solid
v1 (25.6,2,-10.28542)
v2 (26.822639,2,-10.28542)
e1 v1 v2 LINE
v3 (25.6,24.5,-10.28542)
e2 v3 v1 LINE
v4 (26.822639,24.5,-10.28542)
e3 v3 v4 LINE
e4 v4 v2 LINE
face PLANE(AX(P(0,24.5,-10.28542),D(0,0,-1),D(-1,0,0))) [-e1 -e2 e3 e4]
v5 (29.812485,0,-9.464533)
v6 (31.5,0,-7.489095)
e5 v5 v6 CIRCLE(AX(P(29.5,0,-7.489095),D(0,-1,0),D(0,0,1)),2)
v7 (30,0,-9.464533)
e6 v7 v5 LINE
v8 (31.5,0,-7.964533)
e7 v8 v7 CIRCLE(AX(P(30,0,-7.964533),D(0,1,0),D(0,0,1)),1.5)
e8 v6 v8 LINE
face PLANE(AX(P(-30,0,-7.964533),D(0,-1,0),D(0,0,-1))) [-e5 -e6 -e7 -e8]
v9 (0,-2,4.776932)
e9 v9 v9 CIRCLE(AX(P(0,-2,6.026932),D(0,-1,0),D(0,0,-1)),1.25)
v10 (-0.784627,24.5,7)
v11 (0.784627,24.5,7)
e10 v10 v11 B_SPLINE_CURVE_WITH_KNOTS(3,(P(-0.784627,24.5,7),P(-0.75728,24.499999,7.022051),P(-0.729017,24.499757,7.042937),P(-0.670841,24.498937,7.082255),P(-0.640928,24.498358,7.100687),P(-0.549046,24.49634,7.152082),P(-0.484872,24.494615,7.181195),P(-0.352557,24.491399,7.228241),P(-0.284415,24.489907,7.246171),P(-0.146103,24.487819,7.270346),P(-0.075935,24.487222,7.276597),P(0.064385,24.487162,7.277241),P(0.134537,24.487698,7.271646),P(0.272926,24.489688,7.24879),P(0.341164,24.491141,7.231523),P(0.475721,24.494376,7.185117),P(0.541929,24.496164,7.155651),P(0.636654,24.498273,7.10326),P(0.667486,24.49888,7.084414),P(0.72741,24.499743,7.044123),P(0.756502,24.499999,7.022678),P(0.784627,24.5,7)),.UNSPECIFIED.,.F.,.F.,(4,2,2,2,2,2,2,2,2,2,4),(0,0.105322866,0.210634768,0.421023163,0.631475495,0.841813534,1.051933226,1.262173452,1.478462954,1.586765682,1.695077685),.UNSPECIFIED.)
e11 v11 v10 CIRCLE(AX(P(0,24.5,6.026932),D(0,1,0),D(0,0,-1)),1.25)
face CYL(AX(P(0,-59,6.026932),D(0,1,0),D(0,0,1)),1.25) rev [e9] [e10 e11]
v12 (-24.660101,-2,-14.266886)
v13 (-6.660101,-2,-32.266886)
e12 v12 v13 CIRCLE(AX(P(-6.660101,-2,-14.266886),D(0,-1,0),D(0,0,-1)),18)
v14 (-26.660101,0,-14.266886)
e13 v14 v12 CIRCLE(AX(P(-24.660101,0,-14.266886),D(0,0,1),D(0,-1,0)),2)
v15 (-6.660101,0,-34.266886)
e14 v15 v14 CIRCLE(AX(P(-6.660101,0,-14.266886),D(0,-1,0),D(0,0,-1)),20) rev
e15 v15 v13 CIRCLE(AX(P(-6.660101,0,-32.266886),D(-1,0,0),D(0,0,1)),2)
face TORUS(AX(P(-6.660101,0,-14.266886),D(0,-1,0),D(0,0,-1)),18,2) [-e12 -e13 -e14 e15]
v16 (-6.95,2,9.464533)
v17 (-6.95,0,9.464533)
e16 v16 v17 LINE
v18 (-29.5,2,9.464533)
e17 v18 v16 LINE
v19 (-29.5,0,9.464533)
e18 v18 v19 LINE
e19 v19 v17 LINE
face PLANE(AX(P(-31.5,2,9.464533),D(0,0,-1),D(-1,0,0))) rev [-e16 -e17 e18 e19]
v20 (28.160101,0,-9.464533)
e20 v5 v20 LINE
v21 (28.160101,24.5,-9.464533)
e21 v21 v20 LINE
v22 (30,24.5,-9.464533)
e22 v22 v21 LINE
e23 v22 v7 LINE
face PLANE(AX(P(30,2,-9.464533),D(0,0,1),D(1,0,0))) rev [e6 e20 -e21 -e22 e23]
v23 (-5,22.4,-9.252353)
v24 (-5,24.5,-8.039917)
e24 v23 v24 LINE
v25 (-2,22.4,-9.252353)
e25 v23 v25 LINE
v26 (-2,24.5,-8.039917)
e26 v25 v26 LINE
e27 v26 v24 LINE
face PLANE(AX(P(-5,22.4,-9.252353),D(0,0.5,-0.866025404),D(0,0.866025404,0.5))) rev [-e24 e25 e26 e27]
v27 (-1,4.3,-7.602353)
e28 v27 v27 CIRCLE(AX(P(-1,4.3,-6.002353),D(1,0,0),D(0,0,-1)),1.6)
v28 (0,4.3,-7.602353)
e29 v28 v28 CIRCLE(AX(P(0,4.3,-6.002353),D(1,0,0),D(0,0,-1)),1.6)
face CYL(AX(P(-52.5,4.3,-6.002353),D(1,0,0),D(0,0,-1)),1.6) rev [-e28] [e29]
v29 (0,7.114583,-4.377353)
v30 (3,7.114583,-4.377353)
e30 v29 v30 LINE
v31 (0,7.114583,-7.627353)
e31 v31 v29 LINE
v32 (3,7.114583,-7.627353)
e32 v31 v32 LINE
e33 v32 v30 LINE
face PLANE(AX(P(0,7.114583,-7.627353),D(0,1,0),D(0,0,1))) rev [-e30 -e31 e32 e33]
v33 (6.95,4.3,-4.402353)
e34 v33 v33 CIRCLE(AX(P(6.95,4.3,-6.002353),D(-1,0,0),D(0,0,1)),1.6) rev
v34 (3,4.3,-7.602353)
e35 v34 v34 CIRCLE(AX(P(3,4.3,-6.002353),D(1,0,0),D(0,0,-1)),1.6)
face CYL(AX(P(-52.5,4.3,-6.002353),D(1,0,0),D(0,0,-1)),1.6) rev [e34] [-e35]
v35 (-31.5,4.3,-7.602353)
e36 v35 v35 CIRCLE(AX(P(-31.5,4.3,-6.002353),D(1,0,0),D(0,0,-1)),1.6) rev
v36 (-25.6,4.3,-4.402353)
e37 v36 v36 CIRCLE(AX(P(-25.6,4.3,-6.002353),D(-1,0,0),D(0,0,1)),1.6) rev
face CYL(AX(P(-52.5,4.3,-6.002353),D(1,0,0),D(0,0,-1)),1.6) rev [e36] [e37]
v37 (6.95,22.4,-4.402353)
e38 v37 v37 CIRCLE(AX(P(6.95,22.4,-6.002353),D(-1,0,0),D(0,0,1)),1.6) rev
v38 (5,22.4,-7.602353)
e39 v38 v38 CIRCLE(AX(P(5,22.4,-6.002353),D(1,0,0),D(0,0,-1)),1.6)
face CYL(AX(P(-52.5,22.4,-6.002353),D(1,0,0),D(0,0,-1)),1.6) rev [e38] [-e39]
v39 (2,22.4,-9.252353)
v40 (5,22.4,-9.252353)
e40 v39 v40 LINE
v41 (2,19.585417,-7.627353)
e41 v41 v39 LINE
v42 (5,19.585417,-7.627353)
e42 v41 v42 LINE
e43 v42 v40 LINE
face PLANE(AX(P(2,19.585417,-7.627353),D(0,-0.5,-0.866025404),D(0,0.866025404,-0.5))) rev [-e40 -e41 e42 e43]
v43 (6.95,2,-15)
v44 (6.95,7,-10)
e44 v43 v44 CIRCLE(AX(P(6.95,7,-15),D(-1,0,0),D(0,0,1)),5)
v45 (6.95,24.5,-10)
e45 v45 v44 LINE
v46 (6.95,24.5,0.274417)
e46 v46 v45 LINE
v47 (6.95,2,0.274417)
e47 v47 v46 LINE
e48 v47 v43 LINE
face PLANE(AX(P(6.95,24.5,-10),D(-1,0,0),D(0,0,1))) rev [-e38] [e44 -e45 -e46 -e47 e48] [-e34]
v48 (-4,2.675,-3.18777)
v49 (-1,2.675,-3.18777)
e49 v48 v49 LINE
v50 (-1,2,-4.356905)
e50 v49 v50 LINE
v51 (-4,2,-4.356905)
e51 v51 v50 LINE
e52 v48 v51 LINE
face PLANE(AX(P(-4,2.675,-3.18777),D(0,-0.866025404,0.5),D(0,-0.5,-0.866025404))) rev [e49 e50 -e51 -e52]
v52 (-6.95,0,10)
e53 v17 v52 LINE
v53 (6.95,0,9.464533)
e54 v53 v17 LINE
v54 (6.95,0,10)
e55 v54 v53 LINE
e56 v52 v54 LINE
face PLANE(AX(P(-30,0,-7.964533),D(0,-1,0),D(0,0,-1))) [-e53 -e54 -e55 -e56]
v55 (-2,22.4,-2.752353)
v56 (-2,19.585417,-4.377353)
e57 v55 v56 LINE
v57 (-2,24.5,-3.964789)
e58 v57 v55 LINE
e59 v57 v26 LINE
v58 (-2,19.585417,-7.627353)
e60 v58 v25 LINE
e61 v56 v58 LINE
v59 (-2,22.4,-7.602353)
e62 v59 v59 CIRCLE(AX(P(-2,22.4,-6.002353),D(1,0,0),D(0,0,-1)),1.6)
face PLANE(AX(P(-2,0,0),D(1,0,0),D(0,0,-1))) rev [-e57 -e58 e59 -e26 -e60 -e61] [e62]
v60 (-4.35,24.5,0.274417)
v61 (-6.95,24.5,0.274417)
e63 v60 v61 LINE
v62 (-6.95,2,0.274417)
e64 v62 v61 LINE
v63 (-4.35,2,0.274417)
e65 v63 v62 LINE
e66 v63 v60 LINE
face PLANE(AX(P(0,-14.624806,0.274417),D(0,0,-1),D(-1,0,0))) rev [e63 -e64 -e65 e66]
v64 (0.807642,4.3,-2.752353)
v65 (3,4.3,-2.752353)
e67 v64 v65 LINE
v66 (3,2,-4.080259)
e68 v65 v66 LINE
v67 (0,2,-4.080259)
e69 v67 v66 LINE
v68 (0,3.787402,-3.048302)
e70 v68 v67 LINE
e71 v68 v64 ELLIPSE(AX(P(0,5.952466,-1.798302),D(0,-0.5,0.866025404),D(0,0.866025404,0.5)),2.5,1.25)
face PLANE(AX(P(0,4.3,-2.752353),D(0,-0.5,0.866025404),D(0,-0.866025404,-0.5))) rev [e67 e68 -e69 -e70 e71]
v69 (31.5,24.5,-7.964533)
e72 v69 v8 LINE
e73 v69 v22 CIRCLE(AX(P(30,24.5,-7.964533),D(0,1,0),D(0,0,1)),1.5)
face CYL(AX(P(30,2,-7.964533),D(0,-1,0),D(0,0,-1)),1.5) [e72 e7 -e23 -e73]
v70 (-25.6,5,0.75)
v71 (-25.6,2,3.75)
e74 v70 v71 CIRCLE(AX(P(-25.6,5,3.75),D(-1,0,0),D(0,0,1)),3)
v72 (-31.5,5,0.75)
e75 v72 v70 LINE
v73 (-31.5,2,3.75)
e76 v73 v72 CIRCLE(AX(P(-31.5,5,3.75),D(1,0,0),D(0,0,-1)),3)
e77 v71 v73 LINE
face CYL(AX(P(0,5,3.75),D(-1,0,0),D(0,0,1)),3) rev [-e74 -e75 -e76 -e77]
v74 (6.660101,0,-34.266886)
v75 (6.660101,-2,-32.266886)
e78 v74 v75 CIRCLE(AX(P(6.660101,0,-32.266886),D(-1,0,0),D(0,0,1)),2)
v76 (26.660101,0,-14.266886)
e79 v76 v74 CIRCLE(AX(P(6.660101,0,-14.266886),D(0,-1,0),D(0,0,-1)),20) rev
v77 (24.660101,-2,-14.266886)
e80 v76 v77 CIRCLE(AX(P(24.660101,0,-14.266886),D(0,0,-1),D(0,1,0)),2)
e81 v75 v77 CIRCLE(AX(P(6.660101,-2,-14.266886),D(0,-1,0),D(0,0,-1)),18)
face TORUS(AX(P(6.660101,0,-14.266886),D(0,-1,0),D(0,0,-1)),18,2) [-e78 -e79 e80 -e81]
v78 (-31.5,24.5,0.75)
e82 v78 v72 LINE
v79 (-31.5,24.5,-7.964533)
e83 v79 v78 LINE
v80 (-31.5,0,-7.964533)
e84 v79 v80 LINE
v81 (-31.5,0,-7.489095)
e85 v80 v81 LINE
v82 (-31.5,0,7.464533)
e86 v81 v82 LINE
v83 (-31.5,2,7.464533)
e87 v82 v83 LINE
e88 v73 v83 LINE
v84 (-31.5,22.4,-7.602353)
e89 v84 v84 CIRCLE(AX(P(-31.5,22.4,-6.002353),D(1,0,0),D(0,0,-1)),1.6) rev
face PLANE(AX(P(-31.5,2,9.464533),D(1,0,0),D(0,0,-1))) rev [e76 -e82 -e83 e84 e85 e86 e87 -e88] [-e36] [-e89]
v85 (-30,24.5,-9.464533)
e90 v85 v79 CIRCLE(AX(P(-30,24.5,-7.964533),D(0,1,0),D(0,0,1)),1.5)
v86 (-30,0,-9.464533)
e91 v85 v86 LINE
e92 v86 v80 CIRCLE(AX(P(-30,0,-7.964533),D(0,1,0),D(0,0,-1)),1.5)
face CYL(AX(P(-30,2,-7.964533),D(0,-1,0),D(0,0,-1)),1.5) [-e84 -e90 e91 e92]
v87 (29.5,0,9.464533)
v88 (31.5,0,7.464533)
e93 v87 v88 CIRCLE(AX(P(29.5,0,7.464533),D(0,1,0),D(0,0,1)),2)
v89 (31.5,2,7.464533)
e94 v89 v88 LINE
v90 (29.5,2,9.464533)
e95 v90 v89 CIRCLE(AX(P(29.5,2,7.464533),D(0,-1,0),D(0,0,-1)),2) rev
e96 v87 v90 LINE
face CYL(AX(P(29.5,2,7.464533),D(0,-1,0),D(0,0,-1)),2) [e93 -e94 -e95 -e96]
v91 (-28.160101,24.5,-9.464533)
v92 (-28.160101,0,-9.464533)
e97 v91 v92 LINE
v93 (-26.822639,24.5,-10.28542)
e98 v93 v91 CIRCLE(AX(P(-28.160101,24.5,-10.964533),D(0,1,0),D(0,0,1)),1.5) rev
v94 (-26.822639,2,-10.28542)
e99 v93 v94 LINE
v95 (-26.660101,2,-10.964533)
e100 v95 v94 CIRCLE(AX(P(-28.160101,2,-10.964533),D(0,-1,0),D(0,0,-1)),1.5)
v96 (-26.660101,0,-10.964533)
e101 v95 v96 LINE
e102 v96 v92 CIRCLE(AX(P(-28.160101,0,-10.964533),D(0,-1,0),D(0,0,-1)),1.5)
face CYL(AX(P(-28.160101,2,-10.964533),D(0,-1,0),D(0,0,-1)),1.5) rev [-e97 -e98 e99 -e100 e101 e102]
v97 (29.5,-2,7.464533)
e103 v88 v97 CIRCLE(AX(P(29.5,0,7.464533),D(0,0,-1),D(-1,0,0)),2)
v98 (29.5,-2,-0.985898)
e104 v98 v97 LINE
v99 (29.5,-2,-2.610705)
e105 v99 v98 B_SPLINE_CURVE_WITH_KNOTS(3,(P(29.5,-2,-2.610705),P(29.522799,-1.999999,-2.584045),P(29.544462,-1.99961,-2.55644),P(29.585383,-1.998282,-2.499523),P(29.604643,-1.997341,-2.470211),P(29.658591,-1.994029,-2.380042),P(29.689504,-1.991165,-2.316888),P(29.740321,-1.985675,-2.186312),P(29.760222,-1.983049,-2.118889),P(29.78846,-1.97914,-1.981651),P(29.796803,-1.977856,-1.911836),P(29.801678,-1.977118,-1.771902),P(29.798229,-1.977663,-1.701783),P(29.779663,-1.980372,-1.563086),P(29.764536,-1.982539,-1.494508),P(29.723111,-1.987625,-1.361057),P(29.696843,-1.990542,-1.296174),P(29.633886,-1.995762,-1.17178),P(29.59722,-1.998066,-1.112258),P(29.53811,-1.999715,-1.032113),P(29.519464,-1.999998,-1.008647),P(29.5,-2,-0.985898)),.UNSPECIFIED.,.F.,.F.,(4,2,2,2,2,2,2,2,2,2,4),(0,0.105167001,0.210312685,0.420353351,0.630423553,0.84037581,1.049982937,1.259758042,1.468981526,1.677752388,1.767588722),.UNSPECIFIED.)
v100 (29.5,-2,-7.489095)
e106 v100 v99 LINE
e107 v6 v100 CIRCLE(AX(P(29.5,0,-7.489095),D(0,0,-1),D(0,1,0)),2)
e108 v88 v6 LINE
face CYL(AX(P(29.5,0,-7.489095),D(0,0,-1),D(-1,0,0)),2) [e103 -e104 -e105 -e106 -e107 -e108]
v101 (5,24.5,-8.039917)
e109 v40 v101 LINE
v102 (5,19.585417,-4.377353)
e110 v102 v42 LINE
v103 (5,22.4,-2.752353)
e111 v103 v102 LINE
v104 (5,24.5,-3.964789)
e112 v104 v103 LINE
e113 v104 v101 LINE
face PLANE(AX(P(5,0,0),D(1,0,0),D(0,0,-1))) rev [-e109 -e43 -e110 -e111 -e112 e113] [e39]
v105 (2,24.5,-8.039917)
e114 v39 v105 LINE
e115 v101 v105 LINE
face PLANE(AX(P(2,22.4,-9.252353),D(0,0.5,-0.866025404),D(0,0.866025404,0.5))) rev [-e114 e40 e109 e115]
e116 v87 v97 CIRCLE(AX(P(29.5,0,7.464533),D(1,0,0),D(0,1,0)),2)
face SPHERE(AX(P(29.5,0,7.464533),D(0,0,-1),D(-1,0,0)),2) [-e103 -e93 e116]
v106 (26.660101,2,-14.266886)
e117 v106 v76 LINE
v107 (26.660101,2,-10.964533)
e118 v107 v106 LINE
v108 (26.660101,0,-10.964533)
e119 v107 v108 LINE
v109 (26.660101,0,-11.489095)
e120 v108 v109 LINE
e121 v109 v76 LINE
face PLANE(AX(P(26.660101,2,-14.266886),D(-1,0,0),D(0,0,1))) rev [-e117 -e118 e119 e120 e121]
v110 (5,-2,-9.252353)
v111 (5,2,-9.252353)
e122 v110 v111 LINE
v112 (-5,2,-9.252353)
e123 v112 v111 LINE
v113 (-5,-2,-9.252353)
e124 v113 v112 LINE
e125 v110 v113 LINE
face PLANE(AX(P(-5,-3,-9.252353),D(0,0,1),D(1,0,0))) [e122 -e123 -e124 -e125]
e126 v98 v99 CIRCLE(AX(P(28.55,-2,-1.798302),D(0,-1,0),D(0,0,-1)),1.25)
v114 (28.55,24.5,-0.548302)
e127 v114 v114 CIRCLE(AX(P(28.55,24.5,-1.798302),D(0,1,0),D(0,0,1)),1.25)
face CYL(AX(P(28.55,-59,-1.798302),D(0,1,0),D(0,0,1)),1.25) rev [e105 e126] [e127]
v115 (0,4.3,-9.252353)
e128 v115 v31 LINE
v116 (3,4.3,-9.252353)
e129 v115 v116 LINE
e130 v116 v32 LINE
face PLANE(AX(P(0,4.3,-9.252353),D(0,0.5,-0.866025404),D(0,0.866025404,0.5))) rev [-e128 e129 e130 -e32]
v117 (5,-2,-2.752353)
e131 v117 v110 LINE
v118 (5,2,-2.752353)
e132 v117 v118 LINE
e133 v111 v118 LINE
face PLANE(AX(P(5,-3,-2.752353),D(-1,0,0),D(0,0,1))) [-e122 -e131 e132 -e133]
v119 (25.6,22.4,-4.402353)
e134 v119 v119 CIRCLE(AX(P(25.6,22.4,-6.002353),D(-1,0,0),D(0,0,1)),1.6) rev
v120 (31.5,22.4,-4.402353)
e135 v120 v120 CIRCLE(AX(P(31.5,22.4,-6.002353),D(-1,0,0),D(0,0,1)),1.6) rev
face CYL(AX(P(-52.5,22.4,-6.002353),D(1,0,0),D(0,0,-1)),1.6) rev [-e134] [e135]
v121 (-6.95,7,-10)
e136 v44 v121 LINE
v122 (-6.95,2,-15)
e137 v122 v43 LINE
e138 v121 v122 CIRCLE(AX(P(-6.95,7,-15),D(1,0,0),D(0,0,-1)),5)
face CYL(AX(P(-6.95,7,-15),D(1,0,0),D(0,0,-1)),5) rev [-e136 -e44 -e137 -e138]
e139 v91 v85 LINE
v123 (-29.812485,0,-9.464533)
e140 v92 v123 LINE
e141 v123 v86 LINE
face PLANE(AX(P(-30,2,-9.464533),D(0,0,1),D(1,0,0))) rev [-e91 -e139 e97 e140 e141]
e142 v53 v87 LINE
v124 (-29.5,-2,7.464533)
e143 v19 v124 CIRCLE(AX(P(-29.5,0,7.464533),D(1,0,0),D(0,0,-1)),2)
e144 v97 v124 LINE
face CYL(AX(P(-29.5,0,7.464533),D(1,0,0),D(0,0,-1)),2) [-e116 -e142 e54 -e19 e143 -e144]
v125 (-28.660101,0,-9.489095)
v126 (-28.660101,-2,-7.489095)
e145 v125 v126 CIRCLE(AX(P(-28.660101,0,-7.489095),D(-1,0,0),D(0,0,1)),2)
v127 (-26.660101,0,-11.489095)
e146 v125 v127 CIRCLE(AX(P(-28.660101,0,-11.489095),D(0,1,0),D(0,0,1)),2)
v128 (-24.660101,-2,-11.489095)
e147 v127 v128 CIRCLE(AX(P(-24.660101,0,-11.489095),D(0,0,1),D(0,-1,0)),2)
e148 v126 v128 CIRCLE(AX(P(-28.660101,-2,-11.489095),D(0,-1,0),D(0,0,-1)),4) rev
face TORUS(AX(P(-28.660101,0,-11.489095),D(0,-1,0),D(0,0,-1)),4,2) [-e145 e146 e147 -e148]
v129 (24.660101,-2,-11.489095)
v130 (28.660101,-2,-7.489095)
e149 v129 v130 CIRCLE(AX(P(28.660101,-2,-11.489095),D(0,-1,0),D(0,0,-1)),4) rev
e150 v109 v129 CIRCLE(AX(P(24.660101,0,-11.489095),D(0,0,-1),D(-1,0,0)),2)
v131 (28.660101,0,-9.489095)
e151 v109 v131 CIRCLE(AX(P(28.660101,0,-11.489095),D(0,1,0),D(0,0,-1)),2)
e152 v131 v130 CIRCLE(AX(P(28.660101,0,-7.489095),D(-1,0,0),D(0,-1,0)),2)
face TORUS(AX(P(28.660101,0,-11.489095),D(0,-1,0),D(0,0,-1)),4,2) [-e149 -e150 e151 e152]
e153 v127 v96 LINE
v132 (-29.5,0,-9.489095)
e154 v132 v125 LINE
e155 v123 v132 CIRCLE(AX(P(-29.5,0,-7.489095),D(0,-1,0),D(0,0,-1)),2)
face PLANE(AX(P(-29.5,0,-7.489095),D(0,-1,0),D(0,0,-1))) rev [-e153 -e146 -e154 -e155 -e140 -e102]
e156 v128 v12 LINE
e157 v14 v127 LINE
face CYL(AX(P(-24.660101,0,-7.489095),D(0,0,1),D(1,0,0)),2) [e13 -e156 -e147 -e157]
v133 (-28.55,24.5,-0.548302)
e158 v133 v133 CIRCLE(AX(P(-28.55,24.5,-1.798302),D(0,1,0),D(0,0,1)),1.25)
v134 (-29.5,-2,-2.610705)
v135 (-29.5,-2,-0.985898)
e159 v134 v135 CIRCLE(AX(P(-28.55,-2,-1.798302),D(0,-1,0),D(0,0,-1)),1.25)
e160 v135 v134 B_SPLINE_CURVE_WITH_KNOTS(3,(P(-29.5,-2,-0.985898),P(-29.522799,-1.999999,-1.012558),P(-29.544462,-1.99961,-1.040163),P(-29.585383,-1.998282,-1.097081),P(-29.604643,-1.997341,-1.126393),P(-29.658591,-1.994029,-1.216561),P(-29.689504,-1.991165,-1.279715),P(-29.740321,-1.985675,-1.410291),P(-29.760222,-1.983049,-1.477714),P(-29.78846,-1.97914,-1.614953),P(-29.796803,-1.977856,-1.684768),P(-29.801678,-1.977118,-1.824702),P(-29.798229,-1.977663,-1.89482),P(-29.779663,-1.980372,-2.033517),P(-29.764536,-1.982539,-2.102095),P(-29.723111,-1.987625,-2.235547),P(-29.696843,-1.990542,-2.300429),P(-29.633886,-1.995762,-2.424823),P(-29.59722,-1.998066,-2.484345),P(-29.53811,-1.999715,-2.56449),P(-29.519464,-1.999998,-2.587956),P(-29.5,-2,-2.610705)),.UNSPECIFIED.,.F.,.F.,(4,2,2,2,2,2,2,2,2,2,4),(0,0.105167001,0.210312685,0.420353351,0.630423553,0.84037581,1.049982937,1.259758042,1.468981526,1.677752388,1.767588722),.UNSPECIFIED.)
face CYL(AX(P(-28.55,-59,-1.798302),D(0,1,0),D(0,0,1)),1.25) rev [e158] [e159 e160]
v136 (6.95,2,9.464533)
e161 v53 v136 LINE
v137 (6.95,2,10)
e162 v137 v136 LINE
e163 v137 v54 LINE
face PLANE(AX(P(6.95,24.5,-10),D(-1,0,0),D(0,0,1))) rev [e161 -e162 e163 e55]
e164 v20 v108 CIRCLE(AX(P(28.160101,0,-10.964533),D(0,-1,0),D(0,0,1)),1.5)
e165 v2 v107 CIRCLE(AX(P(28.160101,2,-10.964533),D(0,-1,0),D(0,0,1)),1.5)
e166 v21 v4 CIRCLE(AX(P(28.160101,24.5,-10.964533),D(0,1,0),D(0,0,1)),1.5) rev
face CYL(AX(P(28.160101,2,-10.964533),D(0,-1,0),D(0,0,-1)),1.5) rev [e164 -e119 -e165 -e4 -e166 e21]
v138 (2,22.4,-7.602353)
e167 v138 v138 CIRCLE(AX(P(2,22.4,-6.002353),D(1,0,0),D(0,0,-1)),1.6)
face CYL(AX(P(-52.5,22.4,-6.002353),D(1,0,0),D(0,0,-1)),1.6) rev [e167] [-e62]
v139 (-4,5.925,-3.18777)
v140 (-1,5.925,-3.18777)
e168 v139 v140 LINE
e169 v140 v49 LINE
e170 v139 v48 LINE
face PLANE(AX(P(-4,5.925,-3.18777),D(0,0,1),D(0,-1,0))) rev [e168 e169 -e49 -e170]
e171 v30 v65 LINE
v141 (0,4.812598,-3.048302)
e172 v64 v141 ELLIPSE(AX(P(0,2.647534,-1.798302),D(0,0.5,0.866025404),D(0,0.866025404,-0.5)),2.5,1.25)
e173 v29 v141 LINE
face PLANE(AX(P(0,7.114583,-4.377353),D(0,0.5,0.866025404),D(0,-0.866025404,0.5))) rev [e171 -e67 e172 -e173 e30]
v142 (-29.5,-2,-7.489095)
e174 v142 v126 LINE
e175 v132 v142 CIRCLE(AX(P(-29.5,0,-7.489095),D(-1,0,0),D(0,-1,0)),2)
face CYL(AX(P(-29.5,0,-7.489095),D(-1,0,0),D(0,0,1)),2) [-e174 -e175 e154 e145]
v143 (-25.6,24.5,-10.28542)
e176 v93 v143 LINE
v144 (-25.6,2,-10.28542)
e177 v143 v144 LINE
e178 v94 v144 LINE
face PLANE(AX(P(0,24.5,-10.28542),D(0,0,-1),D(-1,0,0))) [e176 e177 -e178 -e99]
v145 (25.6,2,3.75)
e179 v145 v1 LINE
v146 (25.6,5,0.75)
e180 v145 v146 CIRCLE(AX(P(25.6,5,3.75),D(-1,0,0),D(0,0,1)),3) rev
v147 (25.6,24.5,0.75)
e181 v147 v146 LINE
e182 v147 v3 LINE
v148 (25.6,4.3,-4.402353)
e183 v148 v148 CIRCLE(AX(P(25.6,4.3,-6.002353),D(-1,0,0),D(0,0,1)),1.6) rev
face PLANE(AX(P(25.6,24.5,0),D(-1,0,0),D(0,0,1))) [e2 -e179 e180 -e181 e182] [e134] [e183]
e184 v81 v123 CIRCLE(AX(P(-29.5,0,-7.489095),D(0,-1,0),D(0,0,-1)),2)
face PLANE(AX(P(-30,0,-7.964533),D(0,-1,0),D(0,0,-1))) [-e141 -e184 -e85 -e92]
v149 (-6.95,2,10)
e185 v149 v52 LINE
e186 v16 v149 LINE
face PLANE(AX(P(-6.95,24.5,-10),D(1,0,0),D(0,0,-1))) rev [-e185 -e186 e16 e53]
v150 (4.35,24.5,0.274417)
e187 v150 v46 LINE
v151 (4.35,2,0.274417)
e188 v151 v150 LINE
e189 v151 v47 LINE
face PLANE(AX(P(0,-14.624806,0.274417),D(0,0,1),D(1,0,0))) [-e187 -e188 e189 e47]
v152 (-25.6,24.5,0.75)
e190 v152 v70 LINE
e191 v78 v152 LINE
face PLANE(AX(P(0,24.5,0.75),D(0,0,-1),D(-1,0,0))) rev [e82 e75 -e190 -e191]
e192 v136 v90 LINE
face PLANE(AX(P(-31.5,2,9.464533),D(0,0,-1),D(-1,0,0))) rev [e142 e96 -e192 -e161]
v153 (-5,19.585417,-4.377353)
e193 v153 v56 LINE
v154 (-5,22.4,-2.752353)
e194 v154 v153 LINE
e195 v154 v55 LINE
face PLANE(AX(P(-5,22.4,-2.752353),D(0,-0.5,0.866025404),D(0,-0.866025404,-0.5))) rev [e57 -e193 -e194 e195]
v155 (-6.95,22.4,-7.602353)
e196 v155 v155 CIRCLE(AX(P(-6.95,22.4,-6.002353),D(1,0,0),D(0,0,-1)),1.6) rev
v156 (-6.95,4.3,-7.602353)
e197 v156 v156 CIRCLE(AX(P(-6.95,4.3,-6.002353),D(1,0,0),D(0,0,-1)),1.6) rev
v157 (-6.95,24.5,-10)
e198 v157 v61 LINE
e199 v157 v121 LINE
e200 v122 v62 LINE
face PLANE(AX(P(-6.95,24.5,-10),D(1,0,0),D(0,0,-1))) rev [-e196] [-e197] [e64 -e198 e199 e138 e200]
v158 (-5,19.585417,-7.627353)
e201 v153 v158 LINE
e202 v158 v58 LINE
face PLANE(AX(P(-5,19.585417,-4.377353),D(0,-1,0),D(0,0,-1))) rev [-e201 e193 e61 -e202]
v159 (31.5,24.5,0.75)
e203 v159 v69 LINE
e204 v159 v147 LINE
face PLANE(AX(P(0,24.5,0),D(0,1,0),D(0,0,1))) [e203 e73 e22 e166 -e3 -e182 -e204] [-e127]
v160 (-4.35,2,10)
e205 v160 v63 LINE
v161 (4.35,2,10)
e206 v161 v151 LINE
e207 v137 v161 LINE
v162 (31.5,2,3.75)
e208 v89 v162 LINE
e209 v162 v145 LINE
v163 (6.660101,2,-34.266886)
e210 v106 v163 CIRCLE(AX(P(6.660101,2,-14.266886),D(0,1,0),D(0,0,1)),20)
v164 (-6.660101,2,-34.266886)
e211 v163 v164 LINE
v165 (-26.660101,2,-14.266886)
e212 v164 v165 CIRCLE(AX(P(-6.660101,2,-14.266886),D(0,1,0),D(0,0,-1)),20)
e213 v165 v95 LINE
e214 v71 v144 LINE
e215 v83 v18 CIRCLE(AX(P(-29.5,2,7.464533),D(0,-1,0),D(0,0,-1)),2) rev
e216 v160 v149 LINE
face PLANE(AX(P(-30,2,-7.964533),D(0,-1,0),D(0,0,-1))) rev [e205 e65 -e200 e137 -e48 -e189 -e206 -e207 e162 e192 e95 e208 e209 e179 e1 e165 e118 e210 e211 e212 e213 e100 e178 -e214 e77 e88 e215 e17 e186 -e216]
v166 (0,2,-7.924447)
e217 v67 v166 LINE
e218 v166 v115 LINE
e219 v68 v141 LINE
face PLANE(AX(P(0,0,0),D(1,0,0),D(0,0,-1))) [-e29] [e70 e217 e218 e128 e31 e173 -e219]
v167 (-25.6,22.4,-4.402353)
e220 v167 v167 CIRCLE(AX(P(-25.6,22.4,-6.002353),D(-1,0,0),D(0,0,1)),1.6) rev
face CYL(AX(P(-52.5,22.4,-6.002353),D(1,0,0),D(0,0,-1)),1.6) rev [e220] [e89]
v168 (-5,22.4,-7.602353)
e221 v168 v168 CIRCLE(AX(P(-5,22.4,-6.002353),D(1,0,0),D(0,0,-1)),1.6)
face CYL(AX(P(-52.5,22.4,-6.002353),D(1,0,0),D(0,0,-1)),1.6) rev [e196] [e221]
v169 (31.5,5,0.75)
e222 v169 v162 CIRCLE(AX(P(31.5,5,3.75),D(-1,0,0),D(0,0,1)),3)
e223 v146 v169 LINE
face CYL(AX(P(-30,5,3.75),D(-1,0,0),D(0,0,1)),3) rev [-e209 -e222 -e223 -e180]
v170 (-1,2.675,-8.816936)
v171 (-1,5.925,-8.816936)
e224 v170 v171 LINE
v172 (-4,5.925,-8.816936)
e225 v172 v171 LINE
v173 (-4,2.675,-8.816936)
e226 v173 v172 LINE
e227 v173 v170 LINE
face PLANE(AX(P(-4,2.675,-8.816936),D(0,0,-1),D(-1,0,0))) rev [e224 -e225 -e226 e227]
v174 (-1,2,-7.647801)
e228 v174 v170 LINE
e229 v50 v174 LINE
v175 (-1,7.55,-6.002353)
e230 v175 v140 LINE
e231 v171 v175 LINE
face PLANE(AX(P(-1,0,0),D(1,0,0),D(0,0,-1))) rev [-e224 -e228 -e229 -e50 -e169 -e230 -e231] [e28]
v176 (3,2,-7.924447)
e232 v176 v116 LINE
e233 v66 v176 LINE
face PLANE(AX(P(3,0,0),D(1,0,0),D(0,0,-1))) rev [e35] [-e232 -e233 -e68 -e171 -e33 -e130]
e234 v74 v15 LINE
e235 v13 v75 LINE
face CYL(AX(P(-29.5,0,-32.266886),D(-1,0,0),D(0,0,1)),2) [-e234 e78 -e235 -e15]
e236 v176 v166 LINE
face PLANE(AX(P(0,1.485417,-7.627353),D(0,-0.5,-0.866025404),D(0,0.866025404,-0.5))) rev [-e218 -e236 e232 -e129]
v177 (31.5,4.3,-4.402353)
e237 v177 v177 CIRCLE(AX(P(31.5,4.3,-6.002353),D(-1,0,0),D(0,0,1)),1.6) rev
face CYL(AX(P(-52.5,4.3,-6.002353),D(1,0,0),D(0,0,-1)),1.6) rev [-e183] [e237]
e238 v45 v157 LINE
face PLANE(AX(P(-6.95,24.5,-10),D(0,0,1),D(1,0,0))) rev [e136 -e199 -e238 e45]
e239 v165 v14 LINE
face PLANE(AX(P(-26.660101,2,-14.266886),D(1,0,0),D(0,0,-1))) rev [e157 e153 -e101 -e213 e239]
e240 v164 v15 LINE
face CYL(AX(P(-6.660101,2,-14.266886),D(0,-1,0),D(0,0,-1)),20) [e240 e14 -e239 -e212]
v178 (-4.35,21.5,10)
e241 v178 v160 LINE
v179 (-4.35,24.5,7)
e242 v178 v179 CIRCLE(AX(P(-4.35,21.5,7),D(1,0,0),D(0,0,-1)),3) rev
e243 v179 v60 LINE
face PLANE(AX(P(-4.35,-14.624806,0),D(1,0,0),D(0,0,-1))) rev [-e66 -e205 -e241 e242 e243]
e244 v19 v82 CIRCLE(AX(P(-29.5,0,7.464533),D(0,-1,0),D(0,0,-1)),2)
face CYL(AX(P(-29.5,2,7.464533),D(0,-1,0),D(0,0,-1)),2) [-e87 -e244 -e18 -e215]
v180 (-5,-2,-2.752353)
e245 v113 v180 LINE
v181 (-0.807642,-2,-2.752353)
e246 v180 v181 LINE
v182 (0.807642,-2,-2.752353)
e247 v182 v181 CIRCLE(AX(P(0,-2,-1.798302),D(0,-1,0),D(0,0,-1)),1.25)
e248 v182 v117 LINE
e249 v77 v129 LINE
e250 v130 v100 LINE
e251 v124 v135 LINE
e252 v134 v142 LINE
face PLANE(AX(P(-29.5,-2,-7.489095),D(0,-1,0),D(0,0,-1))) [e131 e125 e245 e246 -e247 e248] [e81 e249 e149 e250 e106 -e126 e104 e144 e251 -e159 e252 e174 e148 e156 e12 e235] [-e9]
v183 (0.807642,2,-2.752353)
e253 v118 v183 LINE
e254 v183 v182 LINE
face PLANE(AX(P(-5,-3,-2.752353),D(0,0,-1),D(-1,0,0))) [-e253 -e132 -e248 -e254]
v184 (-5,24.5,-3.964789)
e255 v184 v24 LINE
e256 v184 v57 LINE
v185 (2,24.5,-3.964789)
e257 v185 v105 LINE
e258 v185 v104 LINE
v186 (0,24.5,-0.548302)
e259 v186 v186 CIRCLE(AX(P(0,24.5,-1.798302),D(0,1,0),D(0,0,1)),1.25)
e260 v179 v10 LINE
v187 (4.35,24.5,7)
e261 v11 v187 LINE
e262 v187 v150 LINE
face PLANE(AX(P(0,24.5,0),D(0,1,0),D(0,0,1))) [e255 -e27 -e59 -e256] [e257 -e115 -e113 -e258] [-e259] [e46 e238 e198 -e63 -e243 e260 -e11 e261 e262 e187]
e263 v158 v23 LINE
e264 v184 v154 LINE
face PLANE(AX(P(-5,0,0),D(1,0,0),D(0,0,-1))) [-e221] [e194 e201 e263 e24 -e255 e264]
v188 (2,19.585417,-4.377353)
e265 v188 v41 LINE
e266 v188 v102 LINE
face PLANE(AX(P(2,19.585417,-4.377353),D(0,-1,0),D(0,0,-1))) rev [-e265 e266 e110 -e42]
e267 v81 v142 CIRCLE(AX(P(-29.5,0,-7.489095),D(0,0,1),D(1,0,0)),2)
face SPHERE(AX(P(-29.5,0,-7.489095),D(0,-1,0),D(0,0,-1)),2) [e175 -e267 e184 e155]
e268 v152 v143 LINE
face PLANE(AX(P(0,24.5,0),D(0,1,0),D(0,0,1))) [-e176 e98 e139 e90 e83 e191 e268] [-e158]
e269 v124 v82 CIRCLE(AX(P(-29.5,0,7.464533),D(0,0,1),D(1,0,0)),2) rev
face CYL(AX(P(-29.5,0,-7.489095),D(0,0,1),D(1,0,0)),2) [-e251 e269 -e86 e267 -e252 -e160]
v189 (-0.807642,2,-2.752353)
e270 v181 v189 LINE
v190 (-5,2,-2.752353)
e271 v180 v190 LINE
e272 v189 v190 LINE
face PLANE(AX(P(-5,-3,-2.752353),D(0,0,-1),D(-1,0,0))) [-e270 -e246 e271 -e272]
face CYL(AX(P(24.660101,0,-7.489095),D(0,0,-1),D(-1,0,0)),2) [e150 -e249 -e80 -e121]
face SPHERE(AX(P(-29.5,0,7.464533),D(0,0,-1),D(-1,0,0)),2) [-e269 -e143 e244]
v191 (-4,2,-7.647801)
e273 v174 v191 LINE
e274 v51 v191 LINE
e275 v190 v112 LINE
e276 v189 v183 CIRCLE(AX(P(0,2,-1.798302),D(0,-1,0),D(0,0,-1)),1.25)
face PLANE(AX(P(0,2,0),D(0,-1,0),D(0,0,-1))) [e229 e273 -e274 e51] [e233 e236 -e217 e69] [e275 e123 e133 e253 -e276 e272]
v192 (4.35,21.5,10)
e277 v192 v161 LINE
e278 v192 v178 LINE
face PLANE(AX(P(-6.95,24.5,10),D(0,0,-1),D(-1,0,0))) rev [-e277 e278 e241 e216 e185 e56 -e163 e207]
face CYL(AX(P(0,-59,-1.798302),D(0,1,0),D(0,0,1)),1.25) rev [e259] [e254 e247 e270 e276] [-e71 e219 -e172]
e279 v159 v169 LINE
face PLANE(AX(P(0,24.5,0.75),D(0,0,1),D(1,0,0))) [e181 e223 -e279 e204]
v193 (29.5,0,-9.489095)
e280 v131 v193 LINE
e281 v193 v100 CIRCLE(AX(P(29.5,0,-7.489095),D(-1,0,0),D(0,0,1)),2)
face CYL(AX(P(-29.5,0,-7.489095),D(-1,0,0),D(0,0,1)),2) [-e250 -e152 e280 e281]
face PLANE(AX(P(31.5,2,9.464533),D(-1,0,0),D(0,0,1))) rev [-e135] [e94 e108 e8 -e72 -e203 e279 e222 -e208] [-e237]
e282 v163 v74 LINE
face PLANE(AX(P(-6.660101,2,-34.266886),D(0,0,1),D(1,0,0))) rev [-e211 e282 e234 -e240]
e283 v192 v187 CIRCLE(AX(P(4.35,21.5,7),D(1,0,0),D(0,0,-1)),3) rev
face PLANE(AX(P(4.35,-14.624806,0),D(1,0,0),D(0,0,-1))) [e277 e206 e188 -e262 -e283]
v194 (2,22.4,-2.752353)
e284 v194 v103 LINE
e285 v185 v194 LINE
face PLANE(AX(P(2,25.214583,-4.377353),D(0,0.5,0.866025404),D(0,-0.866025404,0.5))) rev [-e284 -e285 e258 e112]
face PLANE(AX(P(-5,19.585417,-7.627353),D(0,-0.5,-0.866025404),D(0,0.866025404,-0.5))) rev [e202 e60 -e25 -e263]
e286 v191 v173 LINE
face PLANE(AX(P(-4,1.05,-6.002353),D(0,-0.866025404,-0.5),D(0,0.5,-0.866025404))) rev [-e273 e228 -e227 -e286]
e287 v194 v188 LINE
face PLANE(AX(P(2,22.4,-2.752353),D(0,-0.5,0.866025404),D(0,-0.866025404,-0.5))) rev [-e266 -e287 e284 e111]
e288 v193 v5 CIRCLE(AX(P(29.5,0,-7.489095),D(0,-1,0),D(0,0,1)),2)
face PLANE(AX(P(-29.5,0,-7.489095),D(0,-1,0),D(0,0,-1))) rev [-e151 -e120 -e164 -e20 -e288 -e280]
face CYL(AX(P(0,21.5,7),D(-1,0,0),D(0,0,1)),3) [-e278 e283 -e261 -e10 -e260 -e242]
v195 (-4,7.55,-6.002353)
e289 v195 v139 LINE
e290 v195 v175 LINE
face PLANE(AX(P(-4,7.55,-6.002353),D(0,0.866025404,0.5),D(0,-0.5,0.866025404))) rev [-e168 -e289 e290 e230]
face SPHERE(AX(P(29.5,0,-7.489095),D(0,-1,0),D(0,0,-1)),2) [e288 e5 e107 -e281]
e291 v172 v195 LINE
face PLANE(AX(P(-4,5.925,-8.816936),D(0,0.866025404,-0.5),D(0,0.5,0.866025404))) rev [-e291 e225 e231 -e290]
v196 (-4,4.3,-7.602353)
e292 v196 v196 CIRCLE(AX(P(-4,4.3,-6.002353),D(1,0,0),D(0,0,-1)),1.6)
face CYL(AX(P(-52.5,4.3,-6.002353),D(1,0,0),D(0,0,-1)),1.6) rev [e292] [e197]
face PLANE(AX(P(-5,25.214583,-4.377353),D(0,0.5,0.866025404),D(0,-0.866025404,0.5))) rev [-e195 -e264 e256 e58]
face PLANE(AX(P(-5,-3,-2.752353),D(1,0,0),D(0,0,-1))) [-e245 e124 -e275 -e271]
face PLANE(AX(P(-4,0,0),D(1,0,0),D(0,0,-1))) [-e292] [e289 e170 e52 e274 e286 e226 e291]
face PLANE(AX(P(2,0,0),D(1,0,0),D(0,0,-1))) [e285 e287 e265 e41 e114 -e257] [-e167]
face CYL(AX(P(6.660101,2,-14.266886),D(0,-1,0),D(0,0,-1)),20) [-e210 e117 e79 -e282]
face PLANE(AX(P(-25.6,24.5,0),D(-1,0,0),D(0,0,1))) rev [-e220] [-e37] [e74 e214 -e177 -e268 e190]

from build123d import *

# Parameters (mm, degrees)
SALIENTE_EXTRUIR1_DEPTH    = 2
CROQUIS2_W                 = 13.9
CROQUIS2_H                 = 20
SALIENTE_EXTRUIR2_DEPTH    = 24.5
SALIENTE_EXTRUIR3_DEPTH    = 22.5
CORTAR_EXTRUIR1_DEPTH      = 27
CORTAR_EXTRUIR1_DEPTH_BACK = 65.5
CROQUIS4_R                 = 1.599999999
REDONDEO1_R                = 3
REDONDEO2_R                = 5
CORTAR_EXTRUIR3_START      = 5
CORTAR_EXTRUIR3_DEPTH      = 3
CORTAR_EXTRUIR4_START      = -2
CORTAR_EXTRUIR4_DEPTH      = 3
CORTAR_EXTRUIR5_START      = -1
CORTAR_EXTRUIR5_DEPTH      = 3
CORTAR_EXTRUIR6_START      = 3
CORTAR_EXTRUIR6_DEPTH      = 3
SALIENTE_EXTRUIR5_START    = 2
SALIENTE_EXTRUIR5_DEPTH    = 2
CORTAR_EXTRUIR8_START      = -22.5
CROQUIS16_W                = 2.6
CROQUIS16_H                = 6.725582711
CROQUIS16_H_2              = 9.694654401
CORTAR_EXTRUIR8_DEPTH      = 22.5
CORTAR_EXTRUIR7_DEPTH      = 3
CORTAR_EXTRUIR7_DEPTH_BACK = 2
CROQUIS13_W                = 10
CROQUIS13_H                = 6.5
REDONDEO6_R                = 2
REDONDEO7_R                = 2
CROQUIS5_R                 = 1.25
CORTAR_EXTRUIR2_DEPTH      = 83.5


# Read off the part's stored shape, not the designer's step: Saliente-Extruir3
with BuildPart() as part:
    # Croquis1 → Saliente-Extruir1 (new body)
    with BuildSketch(Plane(origin=(0, 0, 0), x_dir=(1, 0, 0), z_dir=(0, 1, 0))):
        with BuildLine():
            Line((-31.5, -9.464532567), (31.5, -9.464532567))
            Line((31.5, -9.464532567), (31.5, 7.964532567))
            ThreePointArc((31.5, 7.964532567), (31.060660172, 9.025192739), (30, 9.464532567))
            Line((30, 9.464532567), (28.160101256, 9.464532567))
            ThreePointArc((28.160101256, 9.464532567), (27.099441084, 9.903872396), (26.660101256, 10.964532567))
            Line((26.660101256, 10.964532567), (26.660101256, 14.266885585))
            ThreePointArc((26.660101256, 14.266885585), (20.802236879, 28.409021208), (6.660101256, 34.266885585))
            Line((6.660101256, 34.266885585), (-6.660101256, 34.266885585))
            ThreePointArc((-6.660101256, 34.266885585), (-20.802236879, 28.409021208), (-26.660101256, 14.266885585))
            Line((-26.660101256, 14.266885585), (-26.660101256, 10.964532567))
            ThreePointArc((-26.660101256, 10.964532567), (-27.099441084, 9.903872396), (-28.160101256, 9.464532567))
            Line((-28.160101256, 9.464532567), (-30, 9.464532567))
            ThreePointArc((-30, 9.464532567), (-31.060660172, 9.025192739), (-31.5, 7.964532567))
            Line((-31.5, 7.964532567), (-31.5, -9.464532567))
        make_face()
    extrude(amount=SALIENTE_EXTRUIR1_DEPTH)

    # Croquis2 → Saliente-Extruir2 (add)
    with BuildSketch(Plane(origin=(0, 0, 0), x_dir=(1, 0, 0), z_dir=(0, 1, 0))):
        Rectangle(CROQUIS2_W, CROQUIS2_H)
    extrude(amount=SALIENTE_EXTRUIR2_DEPTH)

    # Saliente-Extruir3 outline → Saliente-Extruir3 (add)
    with BuildSketch(Plane(origin=(0, 2, 0), x_dir=(1, 0, 0), z_dir=(0, 1, 0))):
        with BuildLine():
            Line((-31.5, 7.964532567), (-31.5, -0.75))
            Line((-31.5, -0.75), (-25.6, -0.75))
            Line((-25.6, -0.75), (-25.6, 10.285420177))
            Line((-25.6, 10.285420177), (-26.822638598, 10.285420177))
            ThreePointArc((-26.822638598, 10.285420177), (-27.375457574, 9.686121721), (-28.160101256, 9.464532567))
            Line((-28.160101256, 9.464532567), (-30, 9.464532567))
            ThreePointArc((-30, 9.464532567), (-31.060660172, 9.025192739), (-31.5, 7.964532567))
        make_face()
        with BuildLine():
            Line((31.5, -0.75), (31.5, 7.964532567))
            ThreePointArc((31.5, 7.964532567), (31.060660172, 9.025192739), (30, 9.464532567))
            Line((30, 9.464532567), (28.160101256, 9.464532567))
            ThreePointArc((28.160101256, 9.464532567), (27.375457574, 9.686121721), (26.822638598, 10.285420177))
            Line((26.822638598, 10.285420177), (25.6, 10.285420177))
            Line((25.6, 10.285420177), (25.6, -0.75))
            Line((25.6, -0.75), (31.5, -0.75))
        make_face()
    extrude(amount=SALIENTE_EXTRUIR3_DEPTH)

    # Croquis4 → Cortar-Extruir1 (cut, two sides: drawn at the far end of the back side and taken through both)
    with BuildSketch(Plane.ZY.offset(25.5).offset(-CORTAR_EXTRUIR1_DEPTH_BACK)):
        with Locations((-6.002353017, 4.3)):
            Circle(CROQUIS4_R)
        with Locations((-6.002353017, 22.4)):
            Circle(CROQUIS4_R)
    extrude(amount=CORTAR_EXTRUIR1_DEPTH + CORTAR_EXTRUIR1_DEPTH_BACK, mode=Mode.SUBTRACT)

    # Redondeo1
    redondeo1_edges = [part.edges().sort_by_distance(p)[0] for p in [
        (0, 24.5, 10),
        (-28.55, 2, 0.75),
        (28.55, 2, 0.75),
    ]]
    fillet(redondeo1_edges, radius=REDONDEO1_R)

    # Redondeo2
    redondeo2_edges = [part.edges().sort_by_distance(p)[0] for p in [
        (0, 2, -10),
    ]]
    fillet(redondeo2_edges, radius=REDONDEO2_R)

    # Croquis8 → Cortar-Extruir3 (cut)
    with BuildSketch(Plane(origin=(0, 0, 0), x_dir=(0, 0, -1), z_dir=(1, 0, 0)).offset(CORTAR_EXTRUIR3_START)):
        Polygon((2.752353017, 22.4), (4.377353017, 19.585417438), (7.627353017, 19.585417438), (9.252353017, 22.4), (7.627353017, 25.214582562), (4.377353017, 25.214582562), align=None)
    extrude(amount=-CORTAR_EXTRUIR3_DEPTH, mode=Mode.SUBTRACT)

    # Croquis9 → Cortar-Extruir4 (cut)
    with BuildSketch(Plane(origin=(0, 0, 0), x_dir=(0, 0, -1), z_dir=(1, 0, 0)).offset(CORTAR_EXTRUIR4_START)):
        Polygon((2.752353017, 22.4), (4.377353017, 19.585417438), (7.627353017, 19.585417438), (9.252353017, 22.4), (7.627353017, 25.214582562), (4.377353017, 25.214582562), align=None)
    extrude(amount=-CORTAR_EXTRUIR4_DEPTH, mode=Mode.SUBTRACT)

    # Croquis10 → Cortar-Extruir5 (cut)
    with BuildSketch(Plane(origin=(0, 0, 0), x_dir=(0, 0, -1), z_dir=(1, 0, 0)).offset(CORTAR_EXTRUIR5_START)):
        Polygon((6.002353017, 7.55), (3.187770455, 5.925), (3.187770455, 2.675), (6.002353017, 1.05), (8.816935579, 2.675), (8.816935579, 5.925), align=None)
    extrude(amount=-CORTAR_EXTRUIR5_DEPTH, mode=Mode.SUBTRACT)

    # Croquis11 → Cortar-Extruir6 (cut)
    with BuildSketch(Plane(origin=(0, 0, 0), x_dir=(0, 0, -1), z_dir=(1, 0, 0)).offset(CORTAR_EXTRUIR6_START)):
        Polygon((2.752353017, 4.3), (4.377353017, 1.485417438), (7.627353017, 1.485417438), (9.252353017, 4.3), (7.627353017, 7.114582562), (4.377353017, 7.114582562), align=None)
    extrude(amount=-CORTAR_EXTRUIR6_DEPTH, mode=Mode.SUBTRACT)

    # Croquis15 → Saliente-Extruir5 (add)
    with BuildSketch(Plane.XZ.offset(SALIENTE_EXTRUIR5_START)):
        with BuildLine():
            Line((-31.5, 9.464532567), (31.5, 9.464532567))
            Line((31.5, 9.464532567), (31.5, -7.489095092))
            ThreePointArc((31.5, -7.489095092), (30.914213562, -8.903308654), (29.5, -9.489095092))
            Line((29.5, -9.489095092), (28.660101256, -9.489095092))
            ThreePointArc((28.660101256, -9.489095092), (27.245887693, -10.074881529), (26.660101256, -11.489095092))
            Line((26.660101256, -11.489095092), (26.660101256, -14.266885585))
            ThreePointArc((26.660101256, -14.266885585), (20.802236879, -28.409021208), (6.660101256, -34.266885585))
            Line((6.660101256, -34.266885585), (1.137553535, -34.266885585))
            Line((1.137553535, -34.266885585), (-1.137553535, -34.266885585))
            Line((-1.137553535, -34.266885585), (-6.660101256, -34.266885585))
            ThreePointArc((-6.660101256, -34.266885585), (-20.802236879, -28.409021208), (-26.660101256, -14.266885585))
            Line((-26.660101256, -14.266885585), (-26.660101256, -11.489095092))
            ThreePointArc((-26.660101256, -11.489095092), (-27.245887693, -10.074881529), (-28.660101256, -9.489095092))
            Line((-28.660101256, -9.489095092), (-29.5, -9.489095092))
            ThreePointArc((-29.5, -9.489095092), (-30.914213562, -8.903308654), (-31.5, -7.489095092))
            Line((-31.5, -7.489095092), (-31.5, 9.464532567))
        make_face()
    extrude(amount=-SALIENTE_EXTRUIR5_DEPTH)

    # Croquis16 → Cortar-Extruir8 (cut)
    with BuildSketch(Plane(origin=(0, 24.5, 0), x_dir=(1, 0, 0), z_dir=(0, 1, 0)).offset(CORTAR_EXTRUIR8_START)):
        with Locations((5.65, -3.637208644)):
            Rectangle(CROQUIS16_W, CROQUIS16_H)
        with Locations((5.65, -11.847327201)):
            Rectangle(CROQUIS16_W, CROQUIS16_H_2)
        with Locations((-5.65, -11.847327201)):
            Rectangle(CROQUIS16_W, CROQUIS16_H_2)
        with Locations((-5.65, -3.637208644)):
            Rectangle(CROQUIS16_W, CROQUIS16_H)
    extrude(amount=CORTAR_EXTRUIR8_DEPTH, mode=Mode.SUBTRACT)

    # Croquis13 → Cortar-Extruir7 (cut, two sides: drawn at the far end of the back side and taken through both)
    with BuildSketch(Plane.XZ.offset(-CORTAR_EXTRUIR7_DEPTH_BACK)):
        with Locations((0, -6.002353017)):
            Rectangle(CROQUIS13_W, CROQUIS13_H)
    extrude(amount=CORTAR_EXTRUIR7_DEPTH + CORTAR_EXTRUIR7_DEPTH_BACK, mode=Mode.SUBTRACT)

    # Redondeo6
    redondeo6_edges = [part.edges().sort_by_distance(p)[0] for p in [
        (-31.5, -2, 0.987718738),
        (-30.914213562, -2, -8.903308654),
        (-29.080050628, -2, -9.489095092),
        (-27.245887693, -2, -10.074881529),
        (-26.660101256, -2, -12.877990338),
        (-20.802236879, -2, -28.409021208),
        (0, -2, -34.266885585),
        (20.802236879, -2, -28.409021208),
        (26.660101256, -2, -12.877990338),
        (27.245887693, -2, -10.074881529),
        (29.080050628, -2, -9.489095092),
        (30.914213562, -2, -8.903308654),
        (31.5, -2, 0.987718738),
    ]]
    fillet(redondeo6_edges, radius=REDONDEO6_R - 0.0001)  # a hair under: the kernel refuses the full size

    # Redondeo7
    redondeo7_edges = [part.edges().sort_by_distance(p)[0] for p in [
        (31.5, 0.99995, 9.464532567),
        (-31.5, 0.99995, 9.464532567),
        (0, -2, 9.464532567),
        (30.914242852, -1.414242852, 9.464532567),
        (-30.914242852, -1.414242852, 9.464532567),
    ]]
    fillet(redondeo7_edges, radius=REDONDEO7_R - 0.0001)  # a hair under: the kernel refuses the full size

    # Croquis5 → Cortar-Extruir2 (cut)
    with BuildSketch(Plane(origin=(0, 24.5, 0), x_dir=(1, 0, 0), z_dir=(0, 1, 0))):
        with Locations(Location((0, 1.798301608, 0), (0, 0, 270))):
            Circle(CROQUIS5_R)
        with Locations(Location((0, -6.026932469, 0), (0, 0, 308.880755469))):
            Circle(CROQUIS5_R)
        with Locations(Location((-28.55, 1.798301608, 0), (0, 0, 270))):
            Circle(CROQUIS5_R)
        with Locations(Location((28.55, 1.798301608, 0), (0, 0, 270))):
            Circle(CROQUIS5_R)
    extrude(amount=-CORTAR_EXTRUIR2_DEPTH, mode=Mode.SUBTRACT)


solid = part.part
